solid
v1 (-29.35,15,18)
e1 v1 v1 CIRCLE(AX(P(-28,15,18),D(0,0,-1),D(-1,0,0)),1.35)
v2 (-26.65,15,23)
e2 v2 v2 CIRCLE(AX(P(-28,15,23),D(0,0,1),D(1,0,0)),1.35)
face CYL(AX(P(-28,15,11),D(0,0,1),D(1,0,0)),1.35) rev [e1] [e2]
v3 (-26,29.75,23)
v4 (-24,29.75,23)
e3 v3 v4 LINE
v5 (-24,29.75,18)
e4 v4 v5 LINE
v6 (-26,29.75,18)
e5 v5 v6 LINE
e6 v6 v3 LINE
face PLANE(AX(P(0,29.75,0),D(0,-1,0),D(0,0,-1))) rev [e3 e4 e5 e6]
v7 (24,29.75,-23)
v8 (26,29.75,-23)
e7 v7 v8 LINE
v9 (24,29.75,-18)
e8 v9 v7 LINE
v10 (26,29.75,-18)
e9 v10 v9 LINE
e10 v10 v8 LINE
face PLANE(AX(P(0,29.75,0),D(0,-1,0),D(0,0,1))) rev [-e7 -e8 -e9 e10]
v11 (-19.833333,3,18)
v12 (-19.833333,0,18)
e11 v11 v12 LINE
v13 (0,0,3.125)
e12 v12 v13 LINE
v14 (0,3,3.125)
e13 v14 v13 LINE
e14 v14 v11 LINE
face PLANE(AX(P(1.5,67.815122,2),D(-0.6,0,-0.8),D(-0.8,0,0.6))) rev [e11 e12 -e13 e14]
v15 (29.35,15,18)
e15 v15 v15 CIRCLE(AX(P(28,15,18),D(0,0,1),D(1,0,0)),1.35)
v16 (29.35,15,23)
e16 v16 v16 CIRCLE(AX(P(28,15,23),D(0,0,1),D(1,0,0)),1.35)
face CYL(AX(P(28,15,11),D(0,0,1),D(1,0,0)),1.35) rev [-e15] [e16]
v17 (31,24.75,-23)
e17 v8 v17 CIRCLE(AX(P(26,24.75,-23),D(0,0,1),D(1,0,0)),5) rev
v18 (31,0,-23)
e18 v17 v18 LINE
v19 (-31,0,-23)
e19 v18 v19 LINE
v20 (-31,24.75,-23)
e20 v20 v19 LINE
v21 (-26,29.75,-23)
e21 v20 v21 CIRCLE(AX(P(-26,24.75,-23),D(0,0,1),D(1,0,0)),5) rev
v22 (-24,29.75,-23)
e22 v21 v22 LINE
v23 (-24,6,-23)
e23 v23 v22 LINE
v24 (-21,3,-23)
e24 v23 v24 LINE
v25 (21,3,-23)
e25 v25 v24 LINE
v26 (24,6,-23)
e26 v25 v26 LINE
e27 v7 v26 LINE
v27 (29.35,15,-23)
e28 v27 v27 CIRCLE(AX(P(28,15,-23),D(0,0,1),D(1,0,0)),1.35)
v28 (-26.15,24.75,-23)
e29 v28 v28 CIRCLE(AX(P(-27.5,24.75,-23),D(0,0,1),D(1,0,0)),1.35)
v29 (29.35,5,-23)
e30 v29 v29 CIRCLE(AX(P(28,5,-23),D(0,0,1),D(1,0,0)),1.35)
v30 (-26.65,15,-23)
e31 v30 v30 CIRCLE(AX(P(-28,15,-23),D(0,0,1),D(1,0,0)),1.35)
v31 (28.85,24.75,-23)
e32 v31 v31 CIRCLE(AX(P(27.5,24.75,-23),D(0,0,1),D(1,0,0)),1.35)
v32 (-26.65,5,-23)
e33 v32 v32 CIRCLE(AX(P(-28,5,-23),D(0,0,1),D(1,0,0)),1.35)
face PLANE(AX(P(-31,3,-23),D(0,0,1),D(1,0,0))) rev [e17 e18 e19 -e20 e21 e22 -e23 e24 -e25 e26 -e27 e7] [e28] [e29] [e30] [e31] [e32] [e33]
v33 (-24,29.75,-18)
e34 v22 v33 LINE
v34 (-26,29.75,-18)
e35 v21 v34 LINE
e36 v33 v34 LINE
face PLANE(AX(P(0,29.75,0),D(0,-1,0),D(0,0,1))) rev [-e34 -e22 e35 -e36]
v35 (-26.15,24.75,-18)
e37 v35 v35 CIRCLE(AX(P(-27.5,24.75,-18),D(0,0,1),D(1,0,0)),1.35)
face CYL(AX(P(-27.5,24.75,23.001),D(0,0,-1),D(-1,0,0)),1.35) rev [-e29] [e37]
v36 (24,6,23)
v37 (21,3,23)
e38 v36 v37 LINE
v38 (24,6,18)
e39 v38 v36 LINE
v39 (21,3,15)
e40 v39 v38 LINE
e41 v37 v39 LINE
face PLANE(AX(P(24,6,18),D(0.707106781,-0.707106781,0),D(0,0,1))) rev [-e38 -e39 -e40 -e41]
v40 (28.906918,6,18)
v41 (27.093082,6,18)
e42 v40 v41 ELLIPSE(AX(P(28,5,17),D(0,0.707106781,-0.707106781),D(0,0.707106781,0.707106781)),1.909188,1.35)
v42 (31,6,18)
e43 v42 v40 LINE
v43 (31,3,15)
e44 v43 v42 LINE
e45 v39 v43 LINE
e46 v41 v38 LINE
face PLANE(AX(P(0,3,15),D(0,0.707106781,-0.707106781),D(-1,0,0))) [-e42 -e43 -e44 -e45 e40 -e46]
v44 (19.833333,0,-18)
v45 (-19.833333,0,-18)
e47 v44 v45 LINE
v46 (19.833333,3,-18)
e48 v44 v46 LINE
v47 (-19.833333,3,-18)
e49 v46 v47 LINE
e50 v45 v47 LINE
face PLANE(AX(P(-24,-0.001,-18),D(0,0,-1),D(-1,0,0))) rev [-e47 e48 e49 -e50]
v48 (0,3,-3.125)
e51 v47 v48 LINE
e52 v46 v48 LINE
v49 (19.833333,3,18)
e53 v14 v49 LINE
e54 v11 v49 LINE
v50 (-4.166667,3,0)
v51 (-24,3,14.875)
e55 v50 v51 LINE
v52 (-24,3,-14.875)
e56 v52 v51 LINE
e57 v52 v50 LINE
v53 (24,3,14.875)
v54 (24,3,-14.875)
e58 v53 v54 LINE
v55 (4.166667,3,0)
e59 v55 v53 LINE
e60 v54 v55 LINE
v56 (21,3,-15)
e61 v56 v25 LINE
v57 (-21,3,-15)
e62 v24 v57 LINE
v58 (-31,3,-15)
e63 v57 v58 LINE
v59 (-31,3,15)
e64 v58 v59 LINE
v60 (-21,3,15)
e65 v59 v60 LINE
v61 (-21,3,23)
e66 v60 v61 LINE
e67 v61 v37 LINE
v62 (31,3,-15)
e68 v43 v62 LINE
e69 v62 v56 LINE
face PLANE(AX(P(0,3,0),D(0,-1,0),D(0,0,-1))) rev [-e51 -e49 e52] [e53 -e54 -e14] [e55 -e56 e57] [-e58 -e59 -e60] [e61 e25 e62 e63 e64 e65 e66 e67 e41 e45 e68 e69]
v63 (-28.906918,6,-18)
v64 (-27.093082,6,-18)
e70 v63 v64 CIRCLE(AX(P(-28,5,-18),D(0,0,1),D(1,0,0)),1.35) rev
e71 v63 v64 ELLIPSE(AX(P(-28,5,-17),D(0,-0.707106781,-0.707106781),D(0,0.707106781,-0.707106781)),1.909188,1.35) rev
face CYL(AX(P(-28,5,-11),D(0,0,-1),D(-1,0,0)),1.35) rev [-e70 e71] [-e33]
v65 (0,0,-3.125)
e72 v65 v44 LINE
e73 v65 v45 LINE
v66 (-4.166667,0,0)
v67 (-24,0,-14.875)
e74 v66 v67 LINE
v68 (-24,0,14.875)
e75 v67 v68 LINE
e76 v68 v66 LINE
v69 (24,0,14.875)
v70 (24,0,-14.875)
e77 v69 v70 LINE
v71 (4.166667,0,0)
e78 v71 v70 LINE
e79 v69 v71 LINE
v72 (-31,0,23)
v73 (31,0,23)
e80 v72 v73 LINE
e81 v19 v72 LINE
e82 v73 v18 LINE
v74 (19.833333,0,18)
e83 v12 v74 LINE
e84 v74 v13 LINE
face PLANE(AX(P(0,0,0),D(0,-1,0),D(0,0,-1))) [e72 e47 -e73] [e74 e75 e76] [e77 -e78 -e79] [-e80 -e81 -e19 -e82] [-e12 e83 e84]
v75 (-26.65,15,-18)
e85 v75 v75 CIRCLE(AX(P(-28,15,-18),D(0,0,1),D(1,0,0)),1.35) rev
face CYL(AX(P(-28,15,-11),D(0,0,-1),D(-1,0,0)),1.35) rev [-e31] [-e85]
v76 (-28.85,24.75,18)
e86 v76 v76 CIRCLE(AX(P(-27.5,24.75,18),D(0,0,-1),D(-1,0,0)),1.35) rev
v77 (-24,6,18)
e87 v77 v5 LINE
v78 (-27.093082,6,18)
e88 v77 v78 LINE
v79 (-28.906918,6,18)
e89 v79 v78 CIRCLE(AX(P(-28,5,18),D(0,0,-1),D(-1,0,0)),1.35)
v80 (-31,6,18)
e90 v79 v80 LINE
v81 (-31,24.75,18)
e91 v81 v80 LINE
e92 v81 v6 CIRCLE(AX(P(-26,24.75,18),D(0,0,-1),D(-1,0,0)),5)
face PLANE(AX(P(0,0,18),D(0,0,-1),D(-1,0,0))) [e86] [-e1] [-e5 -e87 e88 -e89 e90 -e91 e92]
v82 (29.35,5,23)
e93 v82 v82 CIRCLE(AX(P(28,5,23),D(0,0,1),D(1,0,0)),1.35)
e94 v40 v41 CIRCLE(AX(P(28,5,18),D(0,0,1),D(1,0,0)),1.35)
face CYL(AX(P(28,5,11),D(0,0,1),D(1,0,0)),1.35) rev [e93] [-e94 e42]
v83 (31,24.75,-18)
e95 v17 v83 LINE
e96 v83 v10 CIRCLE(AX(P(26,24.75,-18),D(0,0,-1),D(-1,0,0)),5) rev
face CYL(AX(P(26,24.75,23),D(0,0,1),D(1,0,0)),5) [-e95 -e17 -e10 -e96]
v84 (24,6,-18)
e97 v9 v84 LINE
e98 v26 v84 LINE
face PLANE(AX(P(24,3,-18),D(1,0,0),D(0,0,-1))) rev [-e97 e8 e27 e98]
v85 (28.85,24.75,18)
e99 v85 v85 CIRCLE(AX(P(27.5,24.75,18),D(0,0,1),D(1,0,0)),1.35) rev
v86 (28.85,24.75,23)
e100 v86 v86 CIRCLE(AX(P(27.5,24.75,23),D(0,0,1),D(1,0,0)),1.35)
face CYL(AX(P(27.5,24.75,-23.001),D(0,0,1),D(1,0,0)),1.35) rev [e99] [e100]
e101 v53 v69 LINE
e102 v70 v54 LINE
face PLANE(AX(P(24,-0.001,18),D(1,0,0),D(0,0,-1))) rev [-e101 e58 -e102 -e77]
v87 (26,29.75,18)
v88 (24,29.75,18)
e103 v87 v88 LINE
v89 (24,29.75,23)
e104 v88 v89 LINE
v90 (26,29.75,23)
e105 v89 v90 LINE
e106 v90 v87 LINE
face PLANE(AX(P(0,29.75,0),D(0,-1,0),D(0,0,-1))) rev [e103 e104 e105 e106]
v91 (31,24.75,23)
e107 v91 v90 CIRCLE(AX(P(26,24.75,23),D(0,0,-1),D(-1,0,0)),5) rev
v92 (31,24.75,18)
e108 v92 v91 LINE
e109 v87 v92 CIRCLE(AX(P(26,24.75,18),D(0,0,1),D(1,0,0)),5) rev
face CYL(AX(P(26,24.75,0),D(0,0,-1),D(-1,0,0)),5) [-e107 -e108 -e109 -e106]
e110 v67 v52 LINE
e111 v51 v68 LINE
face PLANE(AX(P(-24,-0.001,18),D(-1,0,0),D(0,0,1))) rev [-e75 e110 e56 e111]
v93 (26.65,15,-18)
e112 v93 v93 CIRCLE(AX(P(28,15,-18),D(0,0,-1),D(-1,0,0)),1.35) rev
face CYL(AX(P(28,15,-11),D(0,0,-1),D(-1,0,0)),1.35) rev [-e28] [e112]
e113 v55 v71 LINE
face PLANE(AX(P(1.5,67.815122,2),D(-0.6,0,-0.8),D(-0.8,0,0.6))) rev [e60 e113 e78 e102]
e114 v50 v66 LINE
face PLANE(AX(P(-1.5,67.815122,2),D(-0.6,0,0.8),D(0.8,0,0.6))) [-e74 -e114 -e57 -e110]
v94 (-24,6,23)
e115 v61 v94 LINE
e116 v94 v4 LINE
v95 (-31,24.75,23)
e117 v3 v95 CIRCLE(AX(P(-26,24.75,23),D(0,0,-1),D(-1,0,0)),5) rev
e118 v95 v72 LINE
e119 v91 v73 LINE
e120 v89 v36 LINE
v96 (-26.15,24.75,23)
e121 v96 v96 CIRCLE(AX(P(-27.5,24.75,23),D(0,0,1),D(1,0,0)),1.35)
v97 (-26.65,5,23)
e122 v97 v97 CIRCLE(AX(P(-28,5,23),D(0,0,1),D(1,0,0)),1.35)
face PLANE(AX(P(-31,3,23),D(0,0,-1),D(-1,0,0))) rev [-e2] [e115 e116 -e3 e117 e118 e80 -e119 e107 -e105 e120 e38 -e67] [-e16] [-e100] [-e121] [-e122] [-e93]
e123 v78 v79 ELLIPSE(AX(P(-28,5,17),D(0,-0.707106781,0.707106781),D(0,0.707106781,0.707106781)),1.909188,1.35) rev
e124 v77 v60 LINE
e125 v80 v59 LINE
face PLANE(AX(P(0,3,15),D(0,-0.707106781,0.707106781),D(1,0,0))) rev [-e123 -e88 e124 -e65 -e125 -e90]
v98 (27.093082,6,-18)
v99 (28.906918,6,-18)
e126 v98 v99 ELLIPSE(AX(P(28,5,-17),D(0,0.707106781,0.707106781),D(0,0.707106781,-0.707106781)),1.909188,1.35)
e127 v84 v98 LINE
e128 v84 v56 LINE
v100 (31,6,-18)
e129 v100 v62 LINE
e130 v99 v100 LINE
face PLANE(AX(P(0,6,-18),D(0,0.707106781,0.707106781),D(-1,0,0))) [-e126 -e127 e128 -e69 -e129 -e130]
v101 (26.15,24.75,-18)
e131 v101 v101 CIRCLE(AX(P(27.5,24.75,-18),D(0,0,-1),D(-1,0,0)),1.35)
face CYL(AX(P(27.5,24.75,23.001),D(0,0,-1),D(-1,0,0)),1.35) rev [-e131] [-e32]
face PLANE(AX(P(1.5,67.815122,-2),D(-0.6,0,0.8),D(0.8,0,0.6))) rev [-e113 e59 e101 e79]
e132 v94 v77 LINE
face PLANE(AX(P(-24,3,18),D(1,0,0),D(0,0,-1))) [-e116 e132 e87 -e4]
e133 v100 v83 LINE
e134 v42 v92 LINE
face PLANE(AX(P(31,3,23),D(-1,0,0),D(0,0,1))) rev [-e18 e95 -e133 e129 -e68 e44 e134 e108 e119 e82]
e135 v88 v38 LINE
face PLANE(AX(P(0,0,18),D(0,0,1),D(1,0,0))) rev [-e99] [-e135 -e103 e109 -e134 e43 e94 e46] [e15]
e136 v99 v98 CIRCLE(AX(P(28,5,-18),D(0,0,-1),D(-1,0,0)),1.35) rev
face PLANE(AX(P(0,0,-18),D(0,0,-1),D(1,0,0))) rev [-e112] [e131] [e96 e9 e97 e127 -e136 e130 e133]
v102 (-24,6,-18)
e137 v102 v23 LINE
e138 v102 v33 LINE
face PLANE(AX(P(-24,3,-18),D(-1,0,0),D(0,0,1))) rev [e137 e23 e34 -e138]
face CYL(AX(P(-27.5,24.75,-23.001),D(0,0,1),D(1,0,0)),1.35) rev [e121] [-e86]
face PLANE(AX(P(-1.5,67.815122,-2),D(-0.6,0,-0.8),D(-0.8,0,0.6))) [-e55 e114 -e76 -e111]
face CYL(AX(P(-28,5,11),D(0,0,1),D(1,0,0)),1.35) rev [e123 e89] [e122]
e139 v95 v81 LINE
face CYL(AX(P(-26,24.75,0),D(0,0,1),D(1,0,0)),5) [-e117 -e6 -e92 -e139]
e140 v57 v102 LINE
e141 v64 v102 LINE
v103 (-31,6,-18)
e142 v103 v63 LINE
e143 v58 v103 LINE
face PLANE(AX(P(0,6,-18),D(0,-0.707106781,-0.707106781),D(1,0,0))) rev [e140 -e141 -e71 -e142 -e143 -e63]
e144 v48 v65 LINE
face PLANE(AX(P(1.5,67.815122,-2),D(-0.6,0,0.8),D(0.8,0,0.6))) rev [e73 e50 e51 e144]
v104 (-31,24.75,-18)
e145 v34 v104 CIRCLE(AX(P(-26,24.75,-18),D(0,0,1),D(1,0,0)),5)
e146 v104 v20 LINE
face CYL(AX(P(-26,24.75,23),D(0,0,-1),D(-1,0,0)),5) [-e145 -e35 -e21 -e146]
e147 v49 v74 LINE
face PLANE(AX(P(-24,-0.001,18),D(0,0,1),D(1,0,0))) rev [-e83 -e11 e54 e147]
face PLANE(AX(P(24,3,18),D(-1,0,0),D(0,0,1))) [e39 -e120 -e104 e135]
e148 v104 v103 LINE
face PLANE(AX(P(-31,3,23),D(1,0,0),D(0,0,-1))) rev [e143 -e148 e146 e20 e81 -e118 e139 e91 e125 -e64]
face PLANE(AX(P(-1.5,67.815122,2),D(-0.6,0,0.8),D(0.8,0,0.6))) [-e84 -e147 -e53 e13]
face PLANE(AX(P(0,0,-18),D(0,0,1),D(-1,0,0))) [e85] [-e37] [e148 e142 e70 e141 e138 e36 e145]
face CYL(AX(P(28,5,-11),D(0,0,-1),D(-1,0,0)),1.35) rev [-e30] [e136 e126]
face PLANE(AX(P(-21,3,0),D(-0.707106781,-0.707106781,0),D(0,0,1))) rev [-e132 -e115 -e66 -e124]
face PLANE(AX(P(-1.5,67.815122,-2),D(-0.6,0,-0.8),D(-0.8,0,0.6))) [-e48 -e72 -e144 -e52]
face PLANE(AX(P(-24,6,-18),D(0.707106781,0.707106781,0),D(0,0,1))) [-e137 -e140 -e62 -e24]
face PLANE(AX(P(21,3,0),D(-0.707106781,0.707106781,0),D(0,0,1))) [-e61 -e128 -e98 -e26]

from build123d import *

# Parameters (mm, degrees)
SKETCH_1_W          = 62
SKETCH_1_H          = 46
EXTRUDE_1_DEPTH     = 3
SKETCH_2_W          = 7
SKETCH_2_H          = 17
EXTRUDE_2_DEPTH     = 5
SKETCH_3_R          = 1.35
CUT_EXTRUDE_1_DEPTH = 12
SKETCH_7_W          = 7
SKETCH_7_H          = 5
EXTRUDE_4_DEPTH     = 9.75
CUT_EXTRUDE_4_REACH = 64.945
SKETCH_8_R          = 1.35
CUT_EXTRUDE_3_REACH = 50.735
SKETCH_5_W          = 48
SKETCH_5_H          = 36
EXTRUDE_3_DEPTH     = 3
CHAMFER_4_SIZE      = 3
FILLET_1_R          = 5


with BuildPart() as part:
    # 草图1 → 凸台-拉伸1 (new body)
    with BuildSketch(Plane(origin=(0, 0, 0), x_dir=(1, 0, 0), z_dir=(0, 1, 0))):
        Rectangle(SKETCH_1_W, SKETCH_1_H)
    extrude(amount=EXTRUDE_1_DEPTH)

    # 草图2 → 凸台-拉伸2 (add)
    with BuildSketch(Plane.XY.offset(23)):
        with Locations((-27.5, 11.5)):
            Rectangle(SKETCH_2_W, SKETCH_2_H)
        with Locations((27.5, 11.5)):
            Rectangle(SKETCH_2_W, SKETCH_2_H)
    extrude_2 = extrude(amount=-EXTRUDE_2_DEPTH)

    # 草图3 → 切除-拉伸1 (cut)
    with BuildSketch(Plane.XY.offset(23)):
        with Locations((-28, 15)):
            Circle(SKETCH_3_R)
        with Locations((-28, 5)):
            Circle(SKETCH_3_R)
        with Locations((28, 5)):
            Circle(SKETCH_3_R)
        with Locations((28, 15)):
            Circle(SKETCH_3_R)
    cut_extrude_1 = extrude(amount=-CUT_EXTRUDE_1_DEPTH, mode=Mode.SUBTRACT)

    # 草图7 → 凸台-拉伸4 (add)
    with BuildSketch(Plane(origin=(0, 20, 0), x_dir=(1, 0, 0), z_dir=(0, 1, 0))):
        with Locations((-27.5, -20.5)):
            Rectangle(SKETCH_7_W, SKETCH_7_H)
        with Locations((27.5, -20.5)):
            Rectangle(SKETCH_7_W, SKETCH_7_H)
    extrude_4 = extrude(amount=EXTRUDE_4_DEPTH)

    # 草图8 → 切除-拉伸4 (cut, up to next)
    with BuildSketch(Plane.XY.offset(23), mode=Mode.PRIVATE) as cut_extrude_4_sk1:
        with Locations((-27.5, 24.75)):
            Circle(SKETCH_8_R)
    cut_extrude_4_tool1 = extrude(cut_extrude_4_sk1.sketch, amount=-CUT_EXTRUDE_4_REACH, mode=Mode.PRIVATE) & part.part
    # 草图8 → 切除-拉伸4 (cut, up to next)
    with BuildSketch(Plane.XY.offset(23), mode=Mode.PRIVATE) as cut_extrude_4_sk2:
        with Locations((27.5, 24.75)):
            Circle(SKETCH_8_R)
    cut_extrude_4_tool2 = extrude(cut_extrude_4_sk2.sketch, amount=-CUT_EXTRUDE_4_REACH, mode=Mode.PRIVATE) & part.part
    cut_extrude_4_1 = cut_extrude_4_tool1.solids().sort_by_distance((-27.5, 24.75, 23))[0]
    add(cut_extrude_4_1, mode=Mode.SUBTRACT)
    cut_extrude_4_2 = cut_extrude_4_tool2.solids().sort_by_distance((27.5, 24.75, 23))[0]
    add(cut_extrude_4_2, mode=Mode.SUBTRACT)
    cut_extrude_4 = cut_extrude_4_1 + cut_extrude_4_2  # 切除-拉伸4 as one shape, for the pattern or mirror that repeats it

    # 镜向1: 凸台-拉伸2, 切除-拉伸1, 凸台-拉伸4, 切除-拉伸4 across plane
    add(extrude_2.mirror(Plane.XY))
    add(cut_extrude_1.mirror(Plane.XY), mode=Mode.SUBTRACT)
    add(extrude_4.mirror(Plane.XY))
    add(cut_extrude_4.mirror(Plane.XY), mode=Mode.SUBTRACT)

    # 草图5 → 切除-拉伸3 (cut, up to next)
    with BuildSketch(Plane(origin=(0, 29.75, 0), x_dir=(1, 0, 0), z_dir=(0, 1, 0)), mode=Mode.PRIVATE) as cut_extrude_3_sk1:
        Rectangle(SKETCH_5_W, SKETCH_5_H)
    cut_extrude_3_tool1 = extrude(cut_extrude_3_sk1.sketch, amount=-CUT_EXTRUDE_3_REACH, mode=Mode.PRIVATE) & part.part
    add(cut_extrude_3_tool1.solids().sort_by_distance((0, 29.75, 0))[0], mode=Mode.SUBTRACT)

    # 草图6 → 凸台-拉伸3 (add)
    with BuildSketch(Plane(origin=(0, 0, 0), x_dir=(1, 0, 0), z_dir=(0, 1, 0))):
        Polygon((-25.5, 16), (-4.166666667, 0), (0, 3.125), (-22.5, 20), align=None)
        Polygon((0, 3.125), (4.166666667, 0), (25.5, 16), (22.5, 20), align=None)
        Polygon((-4.166666667, 0), (0, -3.125), (4.166666667, 0), (0, 3.125), align=None)
        Polygon((-22.5, -20), (0, -3.125), (-4.166666667, 0), (-25.5, -16), align=None)
        Polygon((0, -3.125), (22.5, -20), (25.5, -16), (4.166666667, 0), align=None)
    extrude(amount=EXTRUDE_3_DEPTH)

    # 倒角4
    # the kernel refuses this chamfer: 3 mm, written as the material it adds along each edge
    with BuildSketch(Plane(origin=(24, 3, -23), x_dir=(-0.9996219169112968, -0.027495876610586046, 0), z_dir=(0, 0, 1))) as chamfer_4_piece_1:
        Polygon((CHAMFER_4_SIZE * 0.999621916911, -CHAMFER_4_SIZE * 0.0274958766106), (-CHAMFER_4_SIZE * 0.0274958766106, -CHAMFER_4_SIZE * 0.999621916911), (0, 0), align=None)
    extrude(amount=5)
    with BuildSketch(Plane(origin=(31, 3, -18), x_dir=(0, -0.02749587661058635, 0.9996219169112968), z_dir=(-1, 0, 0))) as chamfer_4_piece_2_section:
        Polygon((CHAMFER_4_SIZE * 0.999621916911, CHAMFER_4_SIZE * 0.0274958766106), (-CHAMFER_4_SIZE * 0.0274958766106, CHAMFER_4_SIZE * 0.999621916911), (0, 0), align=None)
    chamfer_4_piece_2 = extrude(amount=7, mode=Mode.PRIVATE)
    chamfer_4_piece_2 = chamfer_4_piece_2 - Plane(origin=(28, 5, -15.465016305), x_dir=(1, 0, 0), z_dir=(0, 0, -1)) * Cylinder(1.35, 26, mode=Mode.PRIVATE)
    add(chamfer_4_piece_2)
    with BuildSketch(Plane(origin=(-31, 3, 18), x_dir=(0, -0.02749587661058635, -0.9996219169112968), z_dir=(1, 0, 0))) as chamfer_4_piece_3_section:
        Polygon((CHAMFER_4_SIZE * 0.999621916911, CHAMFER_4_SIZE * 0.0274958766106), (-CHAMFER_4_SIZE * 0.0274958766106, CHAMFER_4_SIZE * 0.999621916911), (0, 0), align=None)
    chamfer_4_piece_3 = extrude(amount=7, mode=Mode.PRIVATE)
    chamfer_4_piece_3 = chamfer_4_piece_3 - Plane(origin=(-28, 5, 15.465016305), x_dir=(1, 0, 0), z_dir=(0, 0, 1)) * Cylinder(1.35, 26, mode=Mode.PRIVATE)
    add(chamfer_4_piece_3)
    with BuildSketch(Plane(origin=(-24, 3, 23), x_dir=(-0.027495876610586775, 0.9996219169112968, 0), z_dir=(0, 0, -1)), Plane(origin=(24, 3, 23), x_dir=(-0.9996219169112968, -0.027495876610586046, 0), z_dir=(0, 0, -1)), Plane(origin=(-24, 3, -23), x_dir=(0.9996219169112968, -0.027495876610586334, 0), z_dir=(0, 0, 1))) as chamfer_4_piece_4:
        Polygon((CHAMFER_4_SIZE * 0.999621916911, CHAMFER_4_SIZE * 0.0274958766106), (-CHAMFER_4_SIZE * 0.0274958766106, CHAMFER_4_SIZE * 0.999621916911), (0, 0), align=None)
    extrude(amount=5)
    with BuildSketch(Plane(origin=(31, 3, 18), x_dir=(0, -0.02749587661058635, -0.9996219169112968), z_dir=(-1, 0, 0))) as chamfer_4_piece_5_section:
        Polygon((CHAMFER_4_SIZE * 0.999621916911, -CHAMFER_4_SIZE * 0.0274958766106), (-CHAMFER_4_SIZE * 0.0274958766106, -CHAMFER_4_SIZE * 0.999621916911), (0, 0), align=None)
    chamfer_4_piece_5 = extrude(amount=7, mode=Mode.PRIVATE)
    chamfer_4_piece_5 = chamfer_4_piece_5 - Plane(origin=(28, 5, 15.465016305), x_dir=(1, 0, 0), z_dir=(0, 0, 1)) * Cylinder(1.35, 26, mode=Mode.PRIVATE)
    add(chamfer_4_piece_5)
    with BuildSketch(Plane(origin=(-31, 3, -18), x_dir=(0, -0.02749587661058635, 0.9996219169112968), z_dir=(1, 0, 0))) as chamfer_4_piece_6_section:
        Polygon((CHAMFER_4_SIZE * 0.999621916911, -CHAMFER_4_SIZE * 0.0274958766106), (-CHAMFER_4_SIZE * 0.0274958766106, -CHAMFER_4_SIZE * 0.999621916911), (0, 0), align=None)
    chamfer_4_piece_6 = extrude(amount=7, mode=Mode.PRIVATE)
    chamfer_4_piece_6 = chamfer_4_piece_6 - Plane(origin=(-28, 5, -15.465016305), x_dir=(1, 0, 0), z_dir=(0, 0, -1)) * Cylinder(1.35, 26, mode=Mode.PRIVATE)
    add(chamfer_4_piece_6)
    with BuildSketch(Plane(origin=(31, 3, -18), x_dir=(0, -0.02749587661058635, 0.9996219169112968), z_dir=(-1, 0, 0))) as chamfer_4_piece_7a_section:
        Polygon((CHAMFER_4_SIZE * 0.999621916911, CHAMFER_4_SIZE * 0.0274958766106), (-CHAMFER_4_SIZE * 0.0274958766106, CHAMFER_4_SIZE * 0.999621916911), (0, 0), align=None)
    chamfer_4_piece_7a = extrude(amount=14.715048964, mode=Mode.PRIVATE)
    chamfer_4_piece_7a = split(chamfer_4_piece_7a, bisect_by=Plane(origin=(20.147093464, 3.915896715, -18.235320098), z_dir=(0.5999999999999999, 0, 0.8000000000000002)), keep=Keep.TOP, mode=Mode.PRIVATE)
    chamfer_4_piece_7a = split(chamfer_4_piece_7a, bisect_by=Plane(origin=(24, 3.915896715, -16.873190305), z_dir=(-1, 0, 0)), keep=Keep.TOP, mode=Mode.PRIVATE)
    with BuildSketch(Plane(origin=(24, 3, -23), x_dir=(-0.9996219169112968, -0.027495876610586046, 0), z_dir=(0, 0, 1))) as chamfer_4_piece_7b_section:
        Polygon((CHAMFER_4_SIZE * 0.999621916911, -CHAMFER_4_SIZE * 0.0274958766106), (-CHAMFER_4_SIZE * 0.0274958766106, -CHAMFER_4_SIZE * 0.999621916911), (0, 0), align=None)
    chamfer_4_piece_7b = extrude(amount=12.715048964, mode=Mode.PRIVATE)
    chamfer_4_piece_7b = split(chamfer_4_piece_7b, bisect_by=Plane(origin=(23.847814651, 3.930122584, -14.760860988), z_dir=(-0.6000000000000001, 0, -0.8)), keep=Keep.TOP, mode=Mode.PRIVATE)
    chamfer_4_piece_7b = split(chamfer_4_piece_7b, bisect_by=Plane(origin=(22.899773965, 3.930122584, -18), z_dir=(0, 0, 1)), keep=Keep.TOP, mode=Mode.PRIVATE)
    chamfer_4_piece_7 = chamfer_4_piece_7a & chamfer_4_piece_7b
    add(chamfer_4_piece_7)
    with BuildSketch(Plane(origin=(-24, 3, 23), x_dir=(-0.027495876610586775, 0.9996219169112968, 0), z_dir=(0, 0, -1))) as chamfer_4_piece_8a_section:
        Polygon((CHAMFER_4_SIZE * 0.999621916911, CHAMFER_4_SIZE * 0.0274958766106), (-CHAMFER_4_SIZE * 0.0274958766106, CHAMFER_4_SIZE * 0.999621916911), (0, 0), align=None)
    chamfer_4_piece_8a = extrude(amount=12.715048964, mode=Mode.PRIVATE)
    chamfer_4_piece_8a = split(chamfer_4_piece_8a, bisect_by=Plane(origin=(-22.899773965, 3.930122584, 18), z_dir=(0, 0, -1)), keep=Keep.TOP, mode=Mode.PRIVATE)
    chamfer_4_piece_8a = split(chamfer_4_piece_8a, bisect_by=Plane(origin=(-23.847814651, 3.930122584, 14.760860988), z_dir=(0.5999999999999998, 0, 0.8000000000000003)), keep=Keep.TOP, mode=Mode.PRIVATE)
    with BuildSketch(Plane(origin=(-31, 3, 18), x_dir=(0, -0.02749587661058635, -0.9996219169112968), z_dir=(1, 0, 0))) as chamfer_4_piece_8b_section:
        Polygon((CHAMFER_4_SIZE * 0.999621916911, CHAMFER_4_SIZE * 0.0274958766106), (-CHAMFER_4_SIZE * 0.0274958766106, CHAMFER_4_SIZE * 0.999621916911), (0, 0), align=None)
    chamfer_4_piece_8b = extrude(amount=14.715048964, mode=Mode.PRIVATE)
    chamfer_4_piece_8b = split(chamfer_4_piece_8b, bisect_by=Plane(origin=(-24, 3.915896715, 16.873190305), z_dir=(1, 0, 0)), keep=Keep.TOP, mode=Mode.PRIVATE)
    chamfer_4_piece_8b = split(chamfer_4_piece_8b, bisect_by=Plane(origin=(-20.147093464, 3.915896715, 18.235320098), z_dir=(-0.6000000000000001, 0, -0.8)), keep=Keep.TOP, mode=Mode.PRIVATE)
    chamfer_4_piece_8 = chamfer_4_piece_8a & chamfer_4_piece_8b
    add(chamfer_4_piece_8)
    with BuildSketch(Plane(origin=(24, 3, 23), x_dir=(-0.9996219169112968, -0.027495876610586046, 0), z_dir=(0, 0, -1))) as chamfer_4_piece_9a_section:
        Polygon((CHAMFER_4_SIZE * 0.999621916911, CHAMFER_4_SIZE * 0.0274958766106), (-CHAMFER_4_SIZE * 0.0274958766106, CHAMFER_4_SIZE * 0.999621916911), (0, 0), align=None)
    chamfer_4_piece_9a = extrude(amount=12.715048964, mode=Mode.PRIVATE)
    chamfer_4_piece_9a = split(chamfer_4_piece_9a, bisect_by=Plane(origin=(23.847814651, 3.930122584, 14.760860988), z_dir=(-0.6000000000000004, 0, 0.7999999999999997)), keep=Keep.TOP, mode=Mode.PRIVATE)
    chamfer_4_piece_9a = split(chamfer_4_piece_9a, bisect_by=Plane(origin=(22.899773965, 3.930122584, 18), z_dir=(0, 0, -1)), keep=Keep.TOP, mode=Mode.PRIVATE)
    with BuildSketch(Plane(origin=(31, 3, 18), x_dir=(0, -0.02749587661058635, -0.9996219169112968), z_dir=(-1, 0, 0))) as chamfer_4_piece_9b_section:
        Polygon((CHAMFER_4_SIZE * 0.999621916911, -CHAMFER_4_SIZE * 0.0274958766106), (-CHAMFER_4_SIZE * 0.0274958766106, -CHAMFER_4_SIZE * 0.999621916911), (0, 0), align=None)
    chamfer_4_piece_9b = extrude(amount=14.715048964, mode=Mode.PRIVATE)
    chamfer_4_piece_9b = split(chamfer_4_piece_9b, bisect_by=Plane(origin=(20.147093464, 3.915896715, 18.235320098), z_dir=(0.6000000000000003, 0, -0.7999999999999998)), keep=Keep.TOP, mode=Mode.PRIVATE)
    chamfer_4_piece_9b = split(chamfer_4_piece_9b, bisect_by=Plane(origin=(24, 3.915896715, 16.873190305), z_dir=(-1, 0, 0)), keep=Keep.TOP, mode=Mode.PRIVATE)
    chamfer_4_piece_9 = chamfer_4_piece_9a & chamfer_4_piece_9b
    add(chamfer_4_piece_9)
    with BuildSketch(Plane(origin=(-24, 3, -23), x_dir=(0.9996219169112968, -0.027495876610586334, 0), z_dir=(0, 0, 1))) as chamfer_4_piece_10a_section:
        Polygon((CHAMFER_4_SIZE * 0.999621916911, CHAMFER_4_SIZE * 0.0274958766106), (-CHAMFER_4_SIZE * 0.0274958766106, CHAMFER_4_SIZE * 0.999621916911), (0, 0), align=None)
    chamfer_4_piece_10a = extrude(amount=12.715048964, mode=Mode.PRIVATE)
    chamfer_4_piece_10a = split(chamfer_4_piece_10a, bisect_by=Plane(origin=(-23.847814651, 3.930122584, -14.760860988), z_dir=(0.6000000000000004, 0, -0.7999999999999999)), keep=Keep.TOP, mode=Mode.PRIVATE)
    chamfer_4_piece_10a = split(chamfer_4_piece_10a, bisect_by=Plane(origin=(-22.899773965, 3.930122584, -18), z_dir=(0, 0, 1)), keep=Keep.TOP, mode=Mode.PRIVATE)
    with BuildSketch(Plane(origin=(-31, 3, -18), x_dir=(0, -0.02749587661058635, 0.9996219169112968), z_dir=(1, 0, 0))) as chamfer_4_piece_10b_section:
        Polygon((CHAMFER_4_SIZE * 0.999621916911, -CHAMFER_4_SIZE * 0.0274958766106), (-CHAMFER_4_SIZE * 0.0274958766106, -CHAMFER_4_SIZE * 0.999621916911), (0, 0), align=None)
    chamfer_4_piece_10b = extrude(amount=14.715048964, mode=Mode.PRIVATE)
    chamfer_4_piece_10b = split(chamfer_4_piece_10b, bisect_by=Plane(origin=(-20.147093464, 3.915896715, -18.235320098), z_dir=(-0.6000000000000005, 0, 0.7999999999999997)), keep=Keep.TOP, mode=Mode.PRIVATE)
    chamfer_4_piece_10b = split(chamfer_4_piece_10b, bisect_by=Plane(origin=(-24, 3.915896715, -16.873190305), z_dir=(1, 0, 0)), keep=Keep.TOP, mode=Mode.PRIVATE)
    chamfer_4_piece_10 = chamfer_4_piece_10a & chamfer_4_piece_10b
    add(chamfer_4_piece_10)

    # 圆角1
    fillet_1_edges = [part.edges().sort_by_distance(p)[0] for p in [
        (-31, 29.75, -20.5),
        (31, 29.75, -20.5),
        (-31, 29.75, 20.5),
        (31, 29.75, 20.5),
    ]]
    fillet(fillet_1_edges, radius=FILLET_1_R)


solid = part.part
